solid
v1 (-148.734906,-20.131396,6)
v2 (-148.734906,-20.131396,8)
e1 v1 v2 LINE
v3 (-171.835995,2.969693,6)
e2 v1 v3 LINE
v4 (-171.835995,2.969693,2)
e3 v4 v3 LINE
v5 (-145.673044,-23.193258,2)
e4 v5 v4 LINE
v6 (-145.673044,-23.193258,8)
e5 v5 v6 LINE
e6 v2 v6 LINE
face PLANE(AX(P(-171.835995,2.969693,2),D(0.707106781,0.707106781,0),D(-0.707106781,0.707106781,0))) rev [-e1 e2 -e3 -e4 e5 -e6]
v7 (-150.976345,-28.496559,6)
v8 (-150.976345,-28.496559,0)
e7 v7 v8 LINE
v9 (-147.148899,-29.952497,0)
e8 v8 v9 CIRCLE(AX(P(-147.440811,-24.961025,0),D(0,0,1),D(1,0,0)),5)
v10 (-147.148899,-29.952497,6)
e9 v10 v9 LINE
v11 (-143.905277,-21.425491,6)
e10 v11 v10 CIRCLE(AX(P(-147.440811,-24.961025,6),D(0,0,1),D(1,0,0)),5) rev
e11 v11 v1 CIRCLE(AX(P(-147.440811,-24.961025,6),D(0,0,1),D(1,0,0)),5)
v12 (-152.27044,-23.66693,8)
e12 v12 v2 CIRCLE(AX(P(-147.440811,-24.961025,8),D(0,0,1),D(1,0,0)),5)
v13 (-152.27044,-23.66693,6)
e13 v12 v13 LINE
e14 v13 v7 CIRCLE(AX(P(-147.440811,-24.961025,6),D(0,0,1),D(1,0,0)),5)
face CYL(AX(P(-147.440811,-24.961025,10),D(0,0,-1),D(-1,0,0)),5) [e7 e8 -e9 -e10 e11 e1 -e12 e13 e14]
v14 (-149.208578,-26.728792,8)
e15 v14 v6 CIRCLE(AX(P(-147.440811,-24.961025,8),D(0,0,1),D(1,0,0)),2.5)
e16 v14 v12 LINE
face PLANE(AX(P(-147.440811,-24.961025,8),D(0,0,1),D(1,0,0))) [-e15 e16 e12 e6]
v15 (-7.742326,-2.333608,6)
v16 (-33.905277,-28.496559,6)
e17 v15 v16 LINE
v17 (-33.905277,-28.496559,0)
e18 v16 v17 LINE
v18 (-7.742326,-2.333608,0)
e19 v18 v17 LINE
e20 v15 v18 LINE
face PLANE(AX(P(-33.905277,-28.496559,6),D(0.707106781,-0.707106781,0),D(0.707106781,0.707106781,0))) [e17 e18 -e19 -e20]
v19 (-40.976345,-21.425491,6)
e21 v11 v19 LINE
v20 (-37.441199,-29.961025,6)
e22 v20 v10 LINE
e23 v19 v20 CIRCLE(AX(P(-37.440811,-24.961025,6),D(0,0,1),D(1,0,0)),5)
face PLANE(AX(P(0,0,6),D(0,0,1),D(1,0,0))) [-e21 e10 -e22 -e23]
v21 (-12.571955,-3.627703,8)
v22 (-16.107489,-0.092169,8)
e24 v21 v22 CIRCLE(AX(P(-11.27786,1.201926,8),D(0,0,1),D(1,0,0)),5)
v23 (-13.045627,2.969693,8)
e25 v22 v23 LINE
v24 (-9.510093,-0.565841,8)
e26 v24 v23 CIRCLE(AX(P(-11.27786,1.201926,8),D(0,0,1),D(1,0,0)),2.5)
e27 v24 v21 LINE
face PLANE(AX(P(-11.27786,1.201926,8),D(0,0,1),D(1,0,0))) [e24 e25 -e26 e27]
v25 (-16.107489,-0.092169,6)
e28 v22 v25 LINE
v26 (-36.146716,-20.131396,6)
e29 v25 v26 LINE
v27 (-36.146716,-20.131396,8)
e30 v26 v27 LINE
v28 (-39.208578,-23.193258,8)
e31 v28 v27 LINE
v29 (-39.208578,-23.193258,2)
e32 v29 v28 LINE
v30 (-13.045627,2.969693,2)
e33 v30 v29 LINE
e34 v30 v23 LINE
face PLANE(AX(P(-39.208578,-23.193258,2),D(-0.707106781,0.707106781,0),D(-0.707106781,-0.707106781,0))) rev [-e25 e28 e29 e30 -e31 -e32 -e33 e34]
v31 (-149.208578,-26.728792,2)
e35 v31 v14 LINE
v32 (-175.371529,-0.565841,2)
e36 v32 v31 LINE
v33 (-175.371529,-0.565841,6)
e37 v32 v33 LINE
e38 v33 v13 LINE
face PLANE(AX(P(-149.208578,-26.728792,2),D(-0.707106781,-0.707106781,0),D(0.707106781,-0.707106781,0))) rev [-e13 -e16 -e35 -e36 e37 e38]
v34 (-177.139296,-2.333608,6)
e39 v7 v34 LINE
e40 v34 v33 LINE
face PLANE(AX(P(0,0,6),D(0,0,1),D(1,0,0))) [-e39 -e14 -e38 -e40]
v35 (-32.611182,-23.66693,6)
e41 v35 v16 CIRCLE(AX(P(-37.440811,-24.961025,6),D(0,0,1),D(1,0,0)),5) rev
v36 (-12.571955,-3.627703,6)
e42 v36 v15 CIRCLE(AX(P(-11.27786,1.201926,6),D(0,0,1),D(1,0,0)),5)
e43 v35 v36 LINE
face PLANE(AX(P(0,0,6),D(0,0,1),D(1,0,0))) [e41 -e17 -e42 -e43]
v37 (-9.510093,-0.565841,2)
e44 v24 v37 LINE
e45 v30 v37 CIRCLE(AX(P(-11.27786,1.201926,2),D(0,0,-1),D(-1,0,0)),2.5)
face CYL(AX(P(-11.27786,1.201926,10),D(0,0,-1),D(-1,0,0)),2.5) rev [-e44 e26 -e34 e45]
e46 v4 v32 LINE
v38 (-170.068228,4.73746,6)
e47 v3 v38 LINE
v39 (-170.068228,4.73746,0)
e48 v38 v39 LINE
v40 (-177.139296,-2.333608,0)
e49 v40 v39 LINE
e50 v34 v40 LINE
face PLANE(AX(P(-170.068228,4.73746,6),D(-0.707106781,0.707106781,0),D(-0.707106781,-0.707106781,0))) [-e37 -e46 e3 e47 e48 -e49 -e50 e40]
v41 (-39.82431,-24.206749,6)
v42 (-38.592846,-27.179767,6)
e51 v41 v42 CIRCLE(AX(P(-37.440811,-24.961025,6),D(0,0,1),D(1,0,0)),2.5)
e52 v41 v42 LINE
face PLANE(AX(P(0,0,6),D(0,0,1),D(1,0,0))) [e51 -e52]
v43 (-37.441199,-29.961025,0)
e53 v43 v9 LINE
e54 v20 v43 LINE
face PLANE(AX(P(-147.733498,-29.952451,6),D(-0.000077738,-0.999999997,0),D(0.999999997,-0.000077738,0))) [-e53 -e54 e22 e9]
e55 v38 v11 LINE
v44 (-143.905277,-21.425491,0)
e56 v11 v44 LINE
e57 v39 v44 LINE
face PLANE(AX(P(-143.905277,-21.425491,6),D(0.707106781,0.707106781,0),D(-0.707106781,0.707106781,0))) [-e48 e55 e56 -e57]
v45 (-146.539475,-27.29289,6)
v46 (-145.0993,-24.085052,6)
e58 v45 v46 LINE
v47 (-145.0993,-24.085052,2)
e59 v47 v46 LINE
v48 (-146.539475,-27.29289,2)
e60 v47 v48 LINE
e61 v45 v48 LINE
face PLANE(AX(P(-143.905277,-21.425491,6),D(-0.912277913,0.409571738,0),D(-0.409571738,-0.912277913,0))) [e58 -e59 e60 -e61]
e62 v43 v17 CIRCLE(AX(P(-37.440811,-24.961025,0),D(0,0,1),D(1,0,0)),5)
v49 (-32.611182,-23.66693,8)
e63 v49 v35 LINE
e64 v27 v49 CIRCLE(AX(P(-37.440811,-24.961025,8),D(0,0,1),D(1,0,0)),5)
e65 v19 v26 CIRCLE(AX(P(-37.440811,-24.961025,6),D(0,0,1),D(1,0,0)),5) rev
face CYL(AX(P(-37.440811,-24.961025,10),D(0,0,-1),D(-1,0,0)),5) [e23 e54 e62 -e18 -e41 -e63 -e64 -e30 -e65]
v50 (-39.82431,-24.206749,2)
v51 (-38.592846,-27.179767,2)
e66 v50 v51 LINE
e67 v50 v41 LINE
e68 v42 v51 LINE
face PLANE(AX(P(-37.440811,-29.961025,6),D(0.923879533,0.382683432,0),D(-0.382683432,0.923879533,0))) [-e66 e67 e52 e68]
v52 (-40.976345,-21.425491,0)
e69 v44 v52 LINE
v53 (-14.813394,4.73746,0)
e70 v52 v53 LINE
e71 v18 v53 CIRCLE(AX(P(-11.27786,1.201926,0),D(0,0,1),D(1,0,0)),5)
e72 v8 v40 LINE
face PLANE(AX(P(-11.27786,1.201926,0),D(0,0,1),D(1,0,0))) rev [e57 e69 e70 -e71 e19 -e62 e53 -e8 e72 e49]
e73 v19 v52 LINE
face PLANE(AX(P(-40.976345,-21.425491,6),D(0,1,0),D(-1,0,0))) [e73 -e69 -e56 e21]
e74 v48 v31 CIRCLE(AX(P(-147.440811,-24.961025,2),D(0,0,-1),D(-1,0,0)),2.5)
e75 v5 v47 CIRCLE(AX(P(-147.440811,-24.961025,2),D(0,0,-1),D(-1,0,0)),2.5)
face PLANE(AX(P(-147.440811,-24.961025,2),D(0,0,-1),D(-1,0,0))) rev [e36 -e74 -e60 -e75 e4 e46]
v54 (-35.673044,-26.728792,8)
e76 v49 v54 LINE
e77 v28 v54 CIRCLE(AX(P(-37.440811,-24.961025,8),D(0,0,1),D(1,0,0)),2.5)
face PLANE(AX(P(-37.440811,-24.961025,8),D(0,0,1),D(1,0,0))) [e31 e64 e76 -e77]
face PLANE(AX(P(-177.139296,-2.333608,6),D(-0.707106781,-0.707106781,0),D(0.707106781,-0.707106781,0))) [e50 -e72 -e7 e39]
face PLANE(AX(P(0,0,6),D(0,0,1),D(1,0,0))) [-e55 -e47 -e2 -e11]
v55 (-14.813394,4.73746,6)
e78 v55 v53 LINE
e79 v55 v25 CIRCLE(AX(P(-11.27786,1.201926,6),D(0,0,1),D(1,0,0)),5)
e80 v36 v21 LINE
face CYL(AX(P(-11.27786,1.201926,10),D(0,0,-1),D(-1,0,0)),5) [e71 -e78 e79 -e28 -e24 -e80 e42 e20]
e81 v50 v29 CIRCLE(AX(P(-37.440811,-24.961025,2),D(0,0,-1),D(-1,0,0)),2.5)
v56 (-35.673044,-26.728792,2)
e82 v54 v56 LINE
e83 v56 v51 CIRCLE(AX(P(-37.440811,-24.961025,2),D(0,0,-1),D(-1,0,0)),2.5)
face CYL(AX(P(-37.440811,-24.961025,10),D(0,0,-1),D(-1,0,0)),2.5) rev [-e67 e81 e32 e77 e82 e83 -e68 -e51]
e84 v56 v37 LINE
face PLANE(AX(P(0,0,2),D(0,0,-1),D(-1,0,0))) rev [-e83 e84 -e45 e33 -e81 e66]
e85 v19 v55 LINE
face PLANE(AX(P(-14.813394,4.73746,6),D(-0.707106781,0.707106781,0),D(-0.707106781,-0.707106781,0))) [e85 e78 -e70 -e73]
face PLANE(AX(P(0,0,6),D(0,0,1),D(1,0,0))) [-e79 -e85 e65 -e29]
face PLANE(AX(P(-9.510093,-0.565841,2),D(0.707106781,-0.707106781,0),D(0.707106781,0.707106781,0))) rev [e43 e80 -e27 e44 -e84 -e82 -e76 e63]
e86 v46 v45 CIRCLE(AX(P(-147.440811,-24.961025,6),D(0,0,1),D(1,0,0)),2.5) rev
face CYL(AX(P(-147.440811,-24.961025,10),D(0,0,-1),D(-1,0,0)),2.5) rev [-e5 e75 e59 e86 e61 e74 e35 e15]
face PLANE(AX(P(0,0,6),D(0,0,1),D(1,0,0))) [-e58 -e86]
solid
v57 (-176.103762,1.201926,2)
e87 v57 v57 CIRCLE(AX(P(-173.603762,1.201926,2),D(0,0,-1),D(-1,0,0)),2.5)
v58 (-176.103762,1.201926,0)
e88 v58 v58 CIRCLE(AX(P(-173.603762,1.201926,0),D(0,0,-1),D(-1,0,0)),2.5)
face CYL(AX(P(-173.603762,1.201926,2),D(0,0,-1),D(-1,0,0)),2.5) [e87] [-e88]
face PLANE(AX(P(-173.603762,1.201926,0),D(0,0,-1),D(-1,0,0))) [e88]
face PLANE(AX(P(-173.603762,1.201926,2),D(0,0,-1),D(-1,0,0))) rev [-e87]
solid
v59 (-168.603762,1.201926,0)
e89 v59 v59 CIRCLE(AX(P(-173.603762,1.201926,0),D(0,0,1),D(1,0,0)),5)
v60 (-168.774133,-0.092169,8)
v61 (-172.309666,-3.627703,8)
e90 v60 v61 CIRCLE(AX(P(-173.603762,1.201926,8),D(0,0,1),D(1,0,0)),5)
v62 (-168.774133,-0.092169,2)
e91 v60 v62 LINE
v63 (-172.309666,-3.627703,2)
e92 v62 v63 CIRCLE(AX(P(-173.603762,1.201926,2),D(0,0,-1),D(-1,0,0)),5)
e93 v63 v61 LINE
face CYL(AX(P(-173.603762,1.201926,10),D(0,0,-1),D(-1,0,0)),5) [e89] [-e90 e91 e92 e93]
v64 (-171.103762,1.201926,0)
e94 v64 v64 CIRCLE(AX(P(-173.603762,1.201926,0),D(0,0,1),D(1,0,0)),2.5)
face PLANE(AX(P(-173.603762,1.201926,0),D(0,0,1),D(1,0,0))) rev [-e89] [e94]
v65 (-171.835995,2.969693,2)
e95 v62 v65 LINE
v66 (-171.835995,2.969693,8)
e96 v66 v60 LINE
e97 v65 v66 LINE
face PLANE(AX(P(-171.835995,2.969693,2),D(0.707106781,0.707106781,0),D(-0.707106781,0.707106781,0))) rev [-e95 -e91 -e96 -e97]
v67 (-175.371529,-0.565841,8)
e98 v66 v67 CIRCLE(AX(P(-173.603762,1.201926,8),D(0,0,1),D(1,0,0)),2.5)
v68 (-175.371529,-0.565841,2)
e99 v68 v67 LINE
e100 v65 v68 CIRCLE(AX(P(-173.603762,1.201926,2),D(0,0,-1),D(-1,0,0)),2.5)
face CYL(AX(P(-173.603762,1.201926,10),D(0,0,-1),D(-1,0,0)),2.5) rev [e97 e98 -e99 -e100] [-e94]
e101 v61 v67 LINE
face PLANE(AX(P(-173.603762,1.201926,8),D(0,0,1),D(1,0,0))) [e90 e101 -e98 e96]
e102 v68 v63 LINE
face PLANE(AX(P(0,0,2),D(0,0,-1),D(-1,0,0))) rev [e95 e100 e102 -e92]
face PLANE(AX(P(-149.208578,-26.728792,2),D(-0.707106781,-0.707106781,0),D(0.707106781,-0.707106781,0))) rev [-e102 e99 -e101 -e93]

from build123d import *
from build123d.topology import SkipClean

# Parameters (mm, degrees)
SKETCH_1_R            = 5
SKETCH_1_R_2          = 2.5
EXTRUDE_1_DEPTH       = 10
EXTRUDE_1_2_DEPTH     = 10
EXTRUDE_1_3_DEPTH     = 10
EXTRUDE_1_4_DEPTH     = 10
EXTRUDE_2_DEPTH       = 6
CUT_EXTRUDE_1_DEPTH   = 4
EXTRUDE_START         = -2
EXTRUDE_3_OUTLINE_R   = 2.5
EXTRUDE_3_DEPTH       = 2
EXTRUDE_3_2_DEPTH     = 2
EXTRUDE_3_3_OUTLINE_R = 2.5
EXTRUDE_3_3_DEPTH     = 2
CUT_EXTRUDE_2_DEPTH   = 4
CUT_EXTRUDE_6_DEPTH   = 8
EXTRUDE_4_DEPTH       = 6
CUT_EXTRUDE_START     = -2
CUT_EXTRUDE_8_DEPTH   = 2
CUT_EXTRUDE_8_2_DEPTH = 2


with BuildPart() as part:
    # Эскиз1 → Бобышка-Вытянуть1 (new body)
    with BuildSketch(Plane.XY):
        with Locations((-11.277859903, 1.201925786)):
            Circle(SKETCH_1_R)
        with Locations((-11.277859903, 1.201925786)):
            Circle(SKETCH_1_R_2, mode=Mode.SUBTRACT)
    extrude(amount=EXTRUDE_1_DEPTH)



with BuildPart() as body_2:
    # Эскиз1 → Extrude 1 2 (new body)
    with BuildSketch(Plane.XY):
        with Locations((-37.440810807, -24.961025118)):
            Circle(SKETCH_1_R)
        with Locations((-37.440810807, -24.961025118)):
            Circle(SKETCH_1_R_2, mode=Mode.SUBTRACT)
    extrude(amount=EXTRUDE_1_2_DEPTH)


with BuildPart() as body_3:
    # Эскиз1 → Extrude 1 3 (new body)
    with BuildSketch(Plane.XY):
        with Locations((-147.440810807, -24.961025118)):
            Circle(SKETCH_1_R)
        with Locations((-147.440810807, -24.961025118)):
            Circle(SKETCH_1_R_2, mode=Mode.SUBTRACT)
    extrude(amount=EXTRUDE_1_3_DEPTH)


with BuildPart() as body_4:
    # Эскиз1 → Extrude 1 4 (new body)
    with BuildSketch(Plane.XY):
        with Locations((-173.603761711, 1.201925786)):
            Circle(SKETCH_1_R)
        with Locations((-173.603761711, 1.201925786)):
            Circle(SKETCH_1_R_2, mode=Mode.SUBTRACT)
    extrude(amount=EXTRUDE_1_4_DEPTH)


with BuildPart() as part_1:
    add(part.part)

    add(body_2.part)  # Бобышка-Вытянуть2 merges body 2
    # Эскиз3 → Бобышка-Вытянуть2 (add)
    with BuildSketch(Plane(origin=(0, 0, 0), x_dir=(-1, 0, 0), z_dir=(0, 0, -1))):
        Polygon((11.277859903, 1.201925786), (14.813393809, 4.737459692), (40.976344713, -21.425491212), (33.905276901, -28.496559024), (7.742325997, -2.33360812), align=None)
        Polygon((147.440810807, -24.961025118), (143.905276901, -21.425491212), (170.068227805, 4.737459692), (177.139295617, -2.33360812), (150.976344713, -28.496559024), align=None)
    extrude(amount=-EXTRUDE_2_DEPTH)

    # Эскиз4 → Вырез-Вытянуть1 (cut)
    with BuildSketch(Plane.XY.offset(6)):
        Polygon((-13.045626856, 2.969692739), (-9.51009295, -0.565841167), (-35.673043854, -26.728792071), (-39.20857776, -23.193258165), align=None)
    extrude(amount=-CUT_EXTRUDE_1_DEPTH, mode=Mode.SUBTRACT)

    # Extrude 3 2 outline → Extrude 3 2 (add)
    with BuildSketch(Plane(origin=(0, 0, 0), x_dir=(-1, 0, 0), z_dir=(0, 0, -1)).offset(EXTRUDE_START)):
        with BuildLine():
            Line((9.51009295, -0.565841167), (13.045626856, 2.969692739))
            ThreePointArc((13.045626856, 2.969692739), (9.51009295, 2.969692739), (9.51009295, -0.565841167))
        make_face()
        with BuildLine():
            Line((39.20857776, -23.193258165), (35.673043854, -26.728792071))
            ThreePointArc((35.673043854, -26.728792071), (39.20857776, -26.728792071), (39.20857776, -23.193258165))
        make_face()
    extrude(amount=EXTRUDE_3_2_DEPTH)

    # Эскиз4<2> → Вырез-Вытянуть2 (cut)
    with BuildSketch(Plane.XY.offset(6)):
        Polygon((-13.045626856, 2.969692739), (-9.51009295, -0.565841167), (-35.673043854, -26.728792071), (-39.20857776, -23.193258165), align=None)
    extrude(amount=CUT_EXTRUDE_2_DEPTH, mode=Mode.SUBTRACT)


with BuildPart() as body_4_2:
    # Бобышка-Вытянуть3: read off the stored shape, not the designer's step
    # Бобышка-Вытянуть3 outline → Бобышка-Вытянуть3 (new body)
    with BuildSketch(Plane(origin=(0, 0, 0), x_dir=(-1, 0, 0), z_dir=(0, 0, -1)).offset(EXTRUDE_START)):
        with Locations((173.603761711, 1.201925786)):
            Circle(EXTRUDE_3_OUTLINE_R)
    extrude(amount=EXTRUDE_3_DEPTH)


with BuildPart() as body_5:
    # Extrude 3 3 outline → Extrude 3 3 (new body)
    with BuildSketch(Plane(origin=(0, 0, 0), x_dir=(-1, 0, 0), z_dir=(0, 0, -1)).offset(EXTRUDE_START)):
        with Locations((147.440810807, -24.961025118)):
            Circle(EXTRUDE_3_3_OUTLINE_R)
    extrude(amount=EXTRUDE_3_3_DEPTH)


with BuildPart() as cut_extrude_6_tool:
    # Эскиз9 → Вырез-Вытянуть6 (new body)
    with BuildSketch(Plane.XY.offset(10)):
        Polygon((-173.603761711, 1.201925786), (-171.835994758, 2.969692739), (-145.673043854, -23.193258165), (-149.20857776, -26.728792071), (-175.371528664, -0.565841167), align=None)
    extrude(amount=-CUT_EXTRUDE_6_DEPTH)


with BuildPart() as part_2:
    add(part_1.part)

    # Вырез-Вытянуть6: cut by cut_extrude_6_tool
    add(cut_extrude_6_tool.part, mode=Mode.SUBTRACT)



with BuildPart() as body_3_1:
    add(body_3.part)

    # Вырез-Вытянуть6: cut by cut_extrude_6_tool
    add(cut_extrude_6_tool.part, mode=Mode.SUBTRACT)


with BuildPart() as body_4_1:
    add(body_4.part)

    # Вырез-Вытянуть6: cut by cut_extrude_6_tool
    add(cut_extrude_6_tool.part, mode=Mode.SUBTRACT)

    # Вырез-Вытянуть8: read off the stored shape, not the designer's step
    # Вырез-Вытянуть8 outline → Вырез-Вытянуть8 (cut)
    with BuildSketch(Plane.XY.offset(10).offset(CUT_EXTRUDE_START)):
        with BuildLine():
            ThreePointArc((-168.774132579, -0.092169439), (-177.139295617, 4.737459691), (-172.309666485, -3.627703345))
            Line((-172.309666485, -3.627703345), (-175.371528664, -0.565841167))
            ThreePointArc((-175.371528664, -0.565841167), (-175.371528664, 2.969692739), (-171.835994758, 2.969692739))
            Line((-171.835994758, 2.969692739), (-168.774132579, -0.092169439))
        make_face()
    extrude(amount=CUT_EXTRUDE_8_DEPTH, mode=Mode.SUBTRACT)


with BuildPart() as part_3:
    with SkipClean():  # the faces are left unmerged after this step: merging them gives an invalid solid
        add(part_2.part)

        add(body_3_1.part)  # Бобышка-Вытянуть4 merges body 3

        add(body_5.part)  # Бобышка-Вытянуть4 merges body 5
        # Эскиз10 → Бобышка-Вытянуть4 (add)
        with BuildSketch(Plane(origin=(0, 0, 0), x_dir=(-1, 0, 0), z_dir=(0, 0, -1))):
            Polygon((40.976344713, -21.425491212), (143.905276901, -21.425491212), (147.733498282, -29.952451171), (37.440810807, -29.961025118), align=None)
        extrude(amount=-EXTRUDE_4_DEPTH)

    # Cut-Extrude 8 2 outline → Cut-Extrude 8 2 (cut)
    with SkipClean():  # the faces are left unmerged after this step: merging them gives an invalid solid
        with BuildSketch(Plane.XY.offset(10).offset(CUT_EXTRUDE_START)):
            with BuildLine():
                Line((-32.611181676, -23.666929892), (-35.673043854, -26.728792071))
                ThreePointArc((-35.673043854, -26.728792071), (-39.20857776, -26.728792071), (-39.20857776, -23.193258165))
                Line((-39.20857776, -23.193258165), (-36.146715581, -20.131395986))
                ThreePointArc((-36.146715581, -20.131395986), (-40.976344714, -28.496559023), (-32.611181676, -23.666929892))
            make_face()
            with BuildLine():
                Line((-9.51009295, -0.565841167), (-12.571955129, -3.627703345))
                ThreePointArc((-12.571955129, -3.627703345), (-7.742325998, 4.737459693), (-16.107489035, -0.092169439))
                Line((-16.107489035, -0.092169439), (-13.045626856, 2.969692739))
                ThreePointArc((-13.045626856, 2.969692739), (-9.51009295, 2.969692739), (-9.51009295, -0.565841167))
            make_face()
            with BuildLine():
                ThreePointArc((-152.270439938, -23.666929892), (-143.905276901, -28.496559024), (-148.734906032, -20.131395986))
                Line((-148.734906032, -20.131395986), (-145.673043854, -23.193258165))
                ThreePointArc((-145.673043854, -23.193258165), (-145.673043854, -26.728792071), (-149.20857776, -26.728792071))
                Line((-149.20857776, -26.728792071), (-152.270439938, -23.666929892))
            make_face()
        extrude(amount=CUT_EXTRUDE_8_2_DEPTH, mode=Mode.SUBTRACT)


solid = Compound([body_4_2.part, body_4_1.part, part_3.part])
